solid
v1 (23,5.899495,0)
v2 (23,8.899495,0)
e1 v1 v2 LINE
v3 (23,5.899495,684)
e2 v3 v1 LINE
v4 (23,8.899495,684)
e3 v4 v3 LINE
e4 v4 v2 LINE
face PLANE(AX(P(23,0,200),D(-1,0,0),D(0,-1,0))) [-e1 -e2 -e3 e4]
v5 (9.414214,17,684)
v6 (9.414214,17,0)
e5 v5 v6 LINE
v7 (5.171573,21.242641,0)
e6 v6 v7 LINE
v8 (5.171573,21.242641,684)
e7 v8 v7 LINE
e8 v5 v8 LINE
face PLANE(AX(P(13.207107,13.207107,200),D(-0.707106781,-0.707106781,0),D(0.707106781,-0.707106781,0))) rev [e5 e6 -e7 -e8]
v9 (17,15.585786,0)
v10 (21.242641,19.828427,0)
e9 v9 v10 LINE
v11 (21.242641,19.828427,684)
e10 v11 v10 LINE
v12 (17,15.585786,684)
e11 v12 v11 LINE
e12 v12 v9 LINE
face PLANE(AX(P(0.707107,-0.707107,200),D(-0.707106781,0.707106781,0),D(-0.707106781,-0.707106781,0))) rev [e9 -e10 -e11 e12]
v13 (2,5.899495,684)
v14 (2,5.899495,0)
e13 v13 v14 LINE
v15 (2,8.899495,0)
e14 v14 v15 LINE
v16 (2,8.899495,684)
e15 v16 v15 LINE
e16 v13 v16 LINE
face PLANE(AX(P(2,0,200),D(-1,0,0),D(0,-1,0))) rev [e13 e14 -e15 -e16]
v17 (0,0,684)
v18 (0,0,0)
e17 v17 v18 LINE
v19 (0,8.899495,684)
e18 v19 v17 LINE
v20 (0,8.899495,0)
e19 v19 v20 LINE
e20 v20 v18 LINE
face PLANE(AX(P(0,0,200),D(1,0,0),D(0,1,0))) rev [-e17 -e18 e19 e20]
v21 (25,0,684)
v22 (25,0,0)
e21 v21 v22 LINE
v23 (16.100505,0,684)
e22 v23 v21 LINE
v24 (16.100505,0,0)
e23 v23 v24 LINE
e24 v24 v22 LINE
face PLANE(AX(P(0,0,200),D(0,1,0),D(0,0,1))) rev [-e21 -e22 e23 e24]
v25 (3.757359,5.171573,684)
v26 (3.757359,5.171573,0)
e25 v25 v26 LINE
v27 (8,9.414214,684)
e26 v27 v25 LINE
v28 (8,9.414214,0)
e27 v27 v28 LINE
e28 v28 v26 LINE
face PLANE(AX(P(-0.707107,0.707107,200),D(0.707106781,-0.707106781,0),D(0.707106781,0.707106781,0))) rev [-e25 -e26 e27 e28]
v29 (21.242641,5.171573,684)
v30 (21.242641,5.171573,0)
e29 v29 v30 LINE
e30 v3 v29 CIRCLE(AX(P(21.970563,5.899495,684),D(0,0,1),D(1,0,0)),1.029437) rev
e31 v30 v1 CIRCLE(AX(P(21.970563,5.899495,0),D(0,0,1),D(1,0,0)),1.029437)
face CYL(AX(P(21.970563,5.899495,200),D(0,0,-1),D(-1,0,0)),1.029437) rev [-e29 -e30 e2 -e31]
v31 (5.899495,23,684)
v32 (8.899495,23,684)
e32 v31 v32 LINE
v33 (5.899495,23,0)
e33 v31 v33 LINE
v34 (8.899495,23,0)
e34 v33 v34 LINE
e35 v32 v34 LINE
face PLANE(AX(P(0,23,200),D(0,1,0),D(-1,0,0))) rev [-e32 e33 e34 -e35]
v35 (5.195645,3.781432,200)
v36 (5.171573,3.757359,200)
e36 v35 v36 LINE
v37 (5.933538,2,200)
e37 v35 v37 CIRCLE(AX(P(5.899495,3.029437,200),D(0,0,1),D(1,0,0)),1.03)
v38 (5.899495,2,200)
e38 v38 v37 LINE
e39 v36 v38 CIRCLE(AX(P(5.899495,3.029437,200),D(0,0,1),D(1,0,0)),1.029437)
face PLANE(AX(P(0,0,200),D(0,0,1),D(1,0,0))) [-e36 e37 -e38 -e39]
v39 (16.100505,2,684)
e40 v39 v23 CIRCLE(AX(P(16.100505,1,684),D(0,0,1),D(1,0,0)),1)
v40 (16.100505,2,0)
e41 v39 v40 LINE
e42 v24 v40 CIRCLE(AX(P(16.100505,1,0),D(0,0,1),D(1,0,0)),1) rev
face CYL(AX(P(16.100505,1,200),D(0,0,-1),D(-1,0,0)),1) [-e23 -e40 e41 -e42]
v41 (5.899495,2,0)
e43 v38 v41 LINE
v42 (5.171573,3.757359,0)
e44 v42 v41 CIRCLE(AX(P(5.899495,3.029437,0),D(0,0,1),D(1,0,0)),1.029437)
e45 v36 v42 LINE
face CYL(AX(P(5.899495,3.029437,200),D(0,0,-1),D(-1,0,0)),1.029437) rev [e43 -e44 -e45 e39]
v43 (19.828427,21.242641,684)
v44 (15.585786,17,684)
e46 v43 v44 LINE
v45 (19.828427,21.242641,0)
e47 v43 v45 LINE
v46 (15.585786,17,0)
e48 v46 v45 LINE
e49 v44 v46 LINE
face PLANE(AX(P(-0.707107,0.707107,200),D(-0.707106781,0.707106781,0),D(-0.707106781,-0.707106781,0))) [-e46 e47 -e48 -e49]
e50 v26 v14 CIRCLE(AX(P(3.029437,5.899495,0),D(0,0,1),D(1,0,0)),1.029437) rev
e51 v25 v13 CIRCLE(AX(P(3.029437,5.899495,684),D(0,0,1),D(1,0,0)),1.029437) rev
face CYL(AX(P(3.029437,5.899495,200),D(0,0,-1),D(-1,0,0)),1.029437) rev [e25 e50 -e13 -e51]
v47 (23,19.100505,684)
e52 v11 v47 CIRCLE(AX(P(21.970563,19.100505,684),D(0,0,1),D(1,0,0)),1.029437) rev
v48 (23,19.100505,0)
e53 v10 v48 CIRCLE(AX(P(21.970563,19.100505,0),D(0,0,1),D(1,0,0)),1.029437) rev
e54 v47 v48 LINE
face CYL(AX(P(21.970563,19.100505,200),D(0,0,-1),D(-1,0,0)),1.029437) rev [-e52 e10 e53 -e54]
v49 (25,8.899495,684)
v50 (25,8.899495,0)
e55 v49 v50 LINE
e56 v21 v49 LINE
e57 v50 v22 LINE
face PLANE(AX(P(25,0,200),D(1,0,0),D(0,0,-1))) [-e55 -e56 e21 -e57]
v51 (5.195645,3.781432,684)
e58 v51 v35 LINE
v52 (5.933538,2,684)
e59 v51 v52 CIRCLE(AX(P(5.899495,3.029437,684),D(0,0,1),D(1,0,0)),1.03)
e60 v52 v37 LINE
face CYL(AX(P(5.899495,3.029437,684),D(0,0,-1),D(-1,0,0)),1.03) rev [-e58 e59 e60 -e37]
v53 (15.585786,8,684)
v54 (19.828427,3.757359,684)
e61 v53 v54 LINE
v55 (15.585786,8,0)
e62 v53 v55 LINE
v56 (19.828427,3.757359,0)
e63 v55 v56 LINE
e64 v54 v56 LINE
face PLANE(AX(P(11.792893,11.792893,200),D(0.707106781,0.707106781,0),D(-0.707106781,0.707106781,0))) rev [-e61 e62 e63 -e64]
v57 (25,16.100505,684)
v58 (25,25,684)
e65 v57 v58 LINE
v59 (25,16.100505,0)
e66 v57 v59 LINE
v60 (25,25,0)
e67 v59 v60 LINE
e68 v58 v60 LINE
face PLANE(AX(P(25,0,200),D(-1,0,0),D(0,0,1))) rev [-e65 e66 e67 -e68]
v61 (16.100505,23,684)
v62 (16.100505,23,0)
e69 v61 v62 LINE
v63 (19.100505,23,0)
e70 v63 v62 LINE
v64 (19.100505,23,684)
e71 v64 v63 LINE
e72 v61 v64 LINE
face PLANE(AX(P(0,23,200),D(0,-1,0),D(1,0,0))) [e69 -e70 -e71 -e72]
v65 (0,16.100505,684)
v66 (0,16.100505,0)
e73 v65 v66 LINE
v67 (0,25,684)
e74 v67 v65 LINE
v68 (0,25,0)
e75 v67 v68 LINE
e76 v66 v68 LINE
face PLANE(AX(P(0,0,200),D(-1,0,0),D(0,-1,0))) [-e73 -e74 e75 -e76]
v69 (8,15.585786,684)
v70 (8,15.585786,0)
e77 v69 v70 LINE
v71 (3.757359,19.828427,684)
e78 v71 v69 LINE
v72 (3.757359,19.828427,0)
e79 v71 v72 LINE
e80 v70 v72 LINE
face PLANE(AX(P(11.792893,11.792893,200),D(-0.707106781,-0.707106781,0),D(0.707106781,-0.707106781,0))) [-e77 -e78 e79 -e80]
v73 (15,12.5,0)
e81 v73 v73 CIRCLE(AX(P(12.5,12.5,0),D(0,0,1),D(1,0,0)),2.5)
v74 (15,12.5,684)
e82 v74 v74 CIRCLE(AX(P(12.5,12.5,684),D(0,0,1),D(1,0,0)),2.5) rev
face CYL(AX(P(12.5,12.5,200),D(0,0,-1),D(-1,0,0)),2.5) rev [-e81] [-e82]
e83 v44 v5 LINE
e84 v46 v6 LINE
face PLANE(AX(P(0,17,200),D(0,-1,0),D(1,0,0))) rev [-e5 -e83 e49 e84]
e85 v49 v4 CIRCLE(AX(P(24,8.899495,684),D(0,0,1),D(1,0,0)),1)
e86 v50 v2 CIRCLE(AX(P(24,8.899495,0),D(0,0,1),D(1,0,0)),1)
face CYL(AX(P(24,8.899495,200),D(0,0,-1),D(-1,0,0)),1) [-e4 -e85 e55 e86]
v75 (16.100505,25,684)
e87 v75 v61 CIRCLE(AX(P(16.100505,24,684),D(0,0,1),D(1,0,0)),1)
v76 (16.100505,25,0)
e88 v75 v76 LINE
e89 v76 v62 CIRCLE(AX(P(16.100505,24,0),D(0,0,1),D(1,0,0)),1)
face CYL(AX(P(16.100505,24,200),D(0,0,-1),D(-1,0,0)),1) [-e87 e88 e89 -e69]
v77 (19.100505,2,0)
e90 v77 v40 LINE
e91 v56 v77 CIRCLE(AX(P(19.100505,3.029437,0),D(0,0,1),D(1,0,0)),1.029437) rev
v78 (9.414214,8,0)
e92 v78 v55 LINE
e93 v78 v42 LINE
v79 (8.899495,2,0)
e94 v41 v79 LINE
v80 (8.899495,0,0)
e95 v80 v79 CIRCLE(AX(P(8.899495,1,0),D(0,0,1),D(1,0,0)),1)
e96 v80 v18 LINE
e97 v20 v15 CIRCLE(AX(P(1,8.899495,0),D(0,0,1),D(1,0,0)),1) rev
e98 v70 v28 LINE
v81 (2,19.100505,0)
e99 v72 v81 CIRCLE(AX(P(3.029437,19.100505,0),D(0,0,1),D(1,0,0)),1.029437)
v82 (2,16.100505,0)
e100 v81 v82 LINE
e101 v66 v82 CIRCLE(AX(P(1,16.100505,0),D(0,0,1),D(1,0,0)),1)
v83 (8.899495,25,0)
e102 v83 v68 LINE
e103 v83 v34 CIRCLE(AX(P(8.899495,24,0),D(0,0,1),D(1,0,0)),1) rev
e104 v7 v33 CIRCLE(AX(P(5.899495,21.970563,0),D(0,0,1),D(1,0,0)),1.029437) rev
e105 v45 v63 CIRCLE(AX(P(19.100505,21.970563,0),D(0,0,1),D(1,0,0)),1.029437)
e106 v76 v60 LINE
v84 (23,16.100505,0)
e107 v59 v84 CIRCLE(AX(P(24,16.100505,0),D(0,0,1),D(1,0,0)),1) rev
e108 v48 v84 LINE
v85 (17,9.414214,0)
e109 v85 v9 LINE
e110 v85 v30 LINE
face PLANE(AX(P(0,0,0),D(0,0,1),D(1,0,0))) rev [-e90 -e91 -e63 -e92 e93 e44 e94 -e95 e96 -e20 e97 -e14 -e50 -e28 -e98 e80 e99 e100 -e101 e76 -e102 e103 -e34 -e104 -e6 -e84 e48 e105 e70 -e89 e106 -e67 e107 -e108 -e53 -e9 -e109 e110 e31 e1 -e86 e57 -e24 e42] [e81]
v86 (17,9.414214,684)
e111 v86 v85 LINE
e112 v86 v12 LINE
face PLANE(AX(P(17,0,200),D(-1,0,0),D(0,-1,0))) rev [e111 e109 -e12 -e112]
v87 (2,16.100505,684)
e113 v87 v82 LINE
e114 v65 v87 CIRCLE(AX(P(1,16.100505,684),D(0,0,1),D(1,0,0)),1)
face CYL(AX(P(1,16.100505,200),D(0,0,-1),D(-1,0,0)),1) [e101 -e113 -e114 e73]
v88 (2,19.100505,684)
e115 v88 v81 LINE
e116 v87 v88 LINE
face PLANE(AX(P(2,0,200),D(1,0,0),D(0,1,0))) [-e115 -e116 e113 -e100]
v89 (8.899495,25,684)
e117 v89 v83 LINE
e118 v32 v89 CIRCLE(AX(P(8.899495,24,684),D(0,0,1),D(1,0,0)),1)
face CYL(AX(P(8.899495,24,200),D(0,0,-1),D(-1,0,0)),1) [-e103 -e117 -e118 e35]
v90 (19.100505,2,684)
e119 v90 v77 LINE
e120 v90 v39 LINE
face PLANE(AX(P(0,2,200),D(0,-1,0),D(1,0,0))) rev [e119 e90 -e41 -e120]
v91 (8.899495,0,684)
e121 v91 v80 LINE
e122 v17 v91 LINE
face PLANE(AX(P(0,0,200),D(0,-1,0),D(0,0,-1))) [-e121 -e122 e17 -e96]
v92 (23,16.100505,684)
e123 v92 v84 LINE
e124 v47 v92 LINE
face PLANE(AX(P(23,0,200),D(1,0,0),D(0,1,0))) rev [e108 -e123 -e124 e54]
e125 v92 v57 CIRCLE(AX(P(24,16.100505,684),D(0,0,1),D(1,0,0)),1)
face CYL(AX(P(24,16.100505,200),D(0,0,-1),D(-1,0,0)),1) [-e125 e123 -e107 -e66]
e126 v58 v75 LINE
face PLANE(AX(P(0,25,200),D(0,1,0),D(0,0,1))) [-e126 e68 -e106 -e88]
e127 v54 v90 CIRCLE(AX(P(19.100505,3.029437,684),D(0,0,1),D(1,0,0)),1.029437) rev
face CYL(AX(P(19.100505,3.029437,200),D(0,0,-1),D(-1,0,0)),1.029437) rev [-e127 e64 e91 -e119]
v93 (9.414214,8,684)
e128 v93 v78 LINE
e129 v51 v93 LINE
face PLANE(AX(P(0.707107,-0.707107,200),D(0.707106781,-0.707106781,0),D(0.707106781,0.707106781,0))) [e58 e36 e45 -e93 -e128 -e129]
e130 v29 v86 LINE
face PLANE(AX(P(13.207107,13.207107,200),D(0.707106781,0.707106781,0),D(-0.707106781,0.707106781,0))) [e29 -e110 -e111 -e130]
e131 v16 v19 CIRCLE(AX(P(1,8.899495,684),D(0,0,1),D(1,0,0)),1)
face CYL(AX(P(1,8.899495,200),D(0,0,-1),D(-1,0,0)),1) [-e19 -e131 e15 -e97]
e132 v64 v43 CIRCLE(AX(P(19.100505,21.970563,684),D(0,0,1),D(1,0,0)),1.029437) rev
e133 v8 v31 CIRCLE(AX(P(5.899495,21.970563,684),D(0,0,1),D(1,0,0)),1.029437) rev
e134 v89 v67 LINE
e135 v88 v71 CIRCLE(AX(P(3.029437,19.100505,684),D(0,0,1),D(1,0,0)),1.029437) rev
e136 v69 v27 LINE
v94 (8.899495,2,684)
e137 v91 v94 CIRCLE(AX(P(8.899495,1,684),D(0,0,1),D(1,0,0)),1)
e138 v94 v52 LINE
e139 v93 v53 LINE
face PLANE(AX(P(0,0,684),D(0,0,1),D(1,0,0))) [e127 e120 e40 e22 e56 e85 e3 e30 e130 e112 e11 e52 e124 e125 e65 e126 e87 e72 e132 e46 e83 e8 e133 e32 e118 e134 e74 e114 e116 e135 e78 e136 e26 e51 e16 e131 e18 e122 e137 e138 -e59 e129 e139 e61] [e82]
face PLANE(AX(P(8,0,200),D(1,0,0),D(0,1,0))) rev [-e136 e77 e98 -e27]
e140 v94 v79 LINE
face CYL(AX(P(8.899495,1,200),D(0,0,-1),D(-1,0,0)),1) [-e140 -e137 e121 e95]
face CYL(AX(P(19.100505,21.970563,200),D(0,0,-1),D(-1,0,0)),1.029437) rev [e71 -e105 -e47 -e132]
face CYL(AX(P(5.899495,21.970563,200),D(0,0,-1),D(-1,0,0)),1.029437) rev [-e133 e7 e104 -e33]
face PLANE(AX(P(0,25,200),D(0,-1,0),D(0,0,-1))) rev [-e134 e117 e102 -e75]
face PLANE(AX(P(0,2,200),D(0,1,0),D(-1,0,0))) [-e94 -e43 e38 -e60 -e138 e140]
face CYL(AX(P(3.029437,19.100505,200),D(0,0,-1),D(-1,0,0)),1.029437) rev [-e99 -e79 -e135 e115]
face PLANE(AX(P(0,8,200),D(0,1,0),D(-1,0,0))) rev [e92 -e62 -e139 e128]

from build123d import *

# Parameters (mm, degrees)
SKETCH2_R               = 2.5
BOSS_EXTRUDE1_DEPTH     = 200
CROQUIS1_R              = 2.5
SALIENTE_EXTRUIR1_DEPTH = 484


with BuildPart() as part:
    # Sketch2 → Boss-Extrude1 (new body)
    with BuildSketch(Plane.XY):
        with BuildLine():
            Line((12.5, 17), (9.414213562, 17))
            Line((9.414213562, 17), (5.171572875, 21.242640687))
            ThreePointArc((5.171572875, 21.242640687), (4.94841893, 22.364511329), (5.899494937, 23))
            Line((5.899494937, 23), (8.899494937, 23))
            ThreePointArc((8.899494937, 23), (9.899494937, 24), (8.899494937, 25))
            Line((8.899494937, 25), (0, 25))
            Line((0, 25), (0, 16.100505063))
            ThreePointArc((0, 16.100505063), (1, 15.100505063), (2, 16.100505063))
            Line((2, 16.100505063), (2, 19.100505063))
            ThreePointArc((2, 19.100505063), (2.635488671, 20.05158107), (3.757359313, 19.828427125))
            Line((3.757359313, 19.828427125), (8, 15.585786438))
            Line((8, 15.585786438), (8, 12.5))
            Line((8, 12.5), (8, 9.414213562))
            Line((8, 9.414213562), (3.757359313, 5.171572875))
            ThreePointArc((3.757359313, 5.171572875), (2.635488671, 4.94841893), (2, 5.899494937))
            Line((2, 5.899494937), (2, 8.899494937))
            ThreePointArc((2, 8.899494937), (1, 9.899494937), (0, 8.899494937))
            Line((0, 8.899494937), (0, 0))
            Line((0, 0), (8.899494937, 0))
            ThreePointArc((8.899494937, 0), (9.899494937, 1), (8.899494937, 2))
            Line((8.899494937, 2), (5.899494937, 2))
            ThreePointArc((5.899494937, 2), (4.94841893, 2.635488671), (5.171572875, 3.757359313))
            Line((5.171572875, 3.757359313), (9.414213562, 8))
            Line((9.414213562, 8), (12.5, 8))
            Line((12.5, 8), (15.585786438, 8))
            Line((15.585786438, 8), (19.828427125, 3.757359313))
            ThreePointArc((19.828427125, 3.757359313), (20.05158107, 2.635488671), (19.100505063, 2))
            Line((19.100505063, 2), (16.100505063, 2))
            ThreePointArc((16.100505063, 2), (15.100505063, 1), (16.100505063, 0))
            Line((16.100505063, 0), (25, 0))
            Line((25, 0), (25, 8.899494937))
            ThreePointArc((25, 8.899494937), (24, 9.899494937), (23, 8.899494937))
            Line((23, 8.899494937), (23, 5.899494937))
            ThreePointArc((23, 5.899494937), (22.364511329, 4.94841893), (21.242640687, 5.171572875))
            Line((21.242640687, 5.171572875), (17, 9.414213562))
            Line((17, 9.414213562), (17, 12.5))
            Line((17, 12.5), (17, 15.585786438))
            Line((17, 15.585786438), (21.242640687, 19.828427125))
            ThreePointArc((21.242640687, 19.828427125), (22.364511329, 20.05158107), (23, 19.100505063))
            Line((23, 19.100505063), (23, 16.100505063))
            ThreePointArc((23, 16.100505063), (24, 15.100505063), (25, 16.100505063))
            Line((25, 16.100505063), (25, 25))
            Line((25, 25), (16.100505063, 25))
            ThreePointArc((16.100505063, 25), (15.100505063, 24), (16.100505063, 23))
            Line((16.100505063, 23), (19.100505063, 23))
            ThreePointArc((19.100505063, 23), (20.05158107, 22.364511329), (19.828427125, 21.242640687))
            Line((19.828427125, 21.242640687), (15.585786438, 17))
            Line((15.585786438, 17), (12.5, 17))
        make_face()
        with Locations((12.5, 12.5)):
            Circle(SKETCH2_R, mode=Mode.SUBTRACT)
    extrude(amount=BOSS_EXTRUDE1_DEPTH)

    # Croquis1 → Saliente-Extruir1 (add)
    with BuildSketch(Plane.XY.offset(200)):
        with BuildLine():
            ThreePointArc((2, 8.899494937), (1, 9.899494937), (0, 8.899494937))
            Line((0, 8.899494937), (0, 0))
            Line((0, 0), (8.899494937, 0))
            ThreePointArc((8.899494937, 0), (9.899494937, 1), (8.899494937, 2))
            Line((8.899494937, 2), (5.93353822, 2))
            ThreePointArc((5.93353822, 2), (4.947899018, 2.635273316), (5.195645112, 3.78143155))
            Line((5.195645112, 3.78143155), (9.414213562, 8))
            Line((9.414213562, 8), (15.585786438, 8))
            Line((15.585786438, 8), (19.828427125, 3.757359313))
            ThreePointArc((19.828427125, 3.757359313), (20.05158107, 2.635488671), (19.100505063, 2))
            Line((19.100505063, 2), (16.100505063, 2))
            ThreePointArc((16.100505063, 2), (15.100505063, 1), (16.100505063, 0))
            Line((16.100505063, 0), (25, 0))
            Line((25, 0), (25, 8.899494937))
            ThreePointArc((25, 8.899494937), (24, 9.899494937), (23, 8.899494937))
            Line((23, 8.899494937), (23, 5.899494937))
            ThreePointArc((23, 5.899494937), (22.364511329, 4.94841893), (21.242640687, 5.171572875))
            Line((21.242640687, 5.171572875), (17, 9.414213562))
            Line((17, 9.414213562), (17, 15.585786438))
            Line((17, 15.585786438), (21.242640687, 19.828427125))
            ThreePointArc((21.242640687, 19.828427125), (22.364511329, 20.05158107), (23, 19.100505063))
            Line((23, 19.100505063), (23, 16.100505063))
            ThreePointArc((23, 16.100505063), (24, 15.100505063), (25, 16.100505063))
            Line((25, 16.100505063), (25, 25))
            Line((25, 25), (16.100505063, 25))
            ThreePointArc((16.100505063, 25), (15.100505063, 24), (16.100505063, 23))
            Line((16.100505063, 23), (19.100505063, 23))
            ThreePointArc((19.100505063, 23), (20.05158107, 22.364511329), (19.828427125, 21.242640687))
            Line((19.828427125, 21.242640687), (15.585786438, 17))
            Line((15.585786438, 17), (9.414213562, 17))
            Line((9.414213562, 17), (5.171572875, 21.242640687))
            ThreePointArc((5.171572875, 21.242640687), (4.94841893, 22.364511329), (5.899494937, 23))
            Line((5.899494937, 23), (8.899494937, 23))
            ThreePointArc((8.899494937, 23), (9.899494937, 24), (8.899494937, 25))
            Line((8.899494937, 25), (0, 25))
            Line((0, 25), (0, 16.100505063))
            ThreePointArc((0, 16.100505063), (1, 15.100505063), (2, 16.100505063))
            Line((2, 16.100505063), (2, 19.100505063))
            ThreePointArc((2, 19.100505063), (2.635488671, 20.05158107), (3.757359313, 19.828427125))
            Line((3.757359313, 19.828427125), (8, 15.585786438))
            Line((8, 15.585786438), (8, 9.414213562))
            Line((8, 9.414213562), (3.757359313, 5.171572875))
            ThreePointArc((3.757359313, 5.171572875), (2.635488671, 4.94841893), (2, 5.899494937))
            Line((2, 5.899494937), (2, 8.899494937))
        make_face()
        with Locations((12.5, 12.5)):
            Circle(CROQUIS1_R, mode=Mode.SUBTRACT)
    extrude(amount=SALIENTE_EXTRUIR1_DEPTH)


solid = part.part
